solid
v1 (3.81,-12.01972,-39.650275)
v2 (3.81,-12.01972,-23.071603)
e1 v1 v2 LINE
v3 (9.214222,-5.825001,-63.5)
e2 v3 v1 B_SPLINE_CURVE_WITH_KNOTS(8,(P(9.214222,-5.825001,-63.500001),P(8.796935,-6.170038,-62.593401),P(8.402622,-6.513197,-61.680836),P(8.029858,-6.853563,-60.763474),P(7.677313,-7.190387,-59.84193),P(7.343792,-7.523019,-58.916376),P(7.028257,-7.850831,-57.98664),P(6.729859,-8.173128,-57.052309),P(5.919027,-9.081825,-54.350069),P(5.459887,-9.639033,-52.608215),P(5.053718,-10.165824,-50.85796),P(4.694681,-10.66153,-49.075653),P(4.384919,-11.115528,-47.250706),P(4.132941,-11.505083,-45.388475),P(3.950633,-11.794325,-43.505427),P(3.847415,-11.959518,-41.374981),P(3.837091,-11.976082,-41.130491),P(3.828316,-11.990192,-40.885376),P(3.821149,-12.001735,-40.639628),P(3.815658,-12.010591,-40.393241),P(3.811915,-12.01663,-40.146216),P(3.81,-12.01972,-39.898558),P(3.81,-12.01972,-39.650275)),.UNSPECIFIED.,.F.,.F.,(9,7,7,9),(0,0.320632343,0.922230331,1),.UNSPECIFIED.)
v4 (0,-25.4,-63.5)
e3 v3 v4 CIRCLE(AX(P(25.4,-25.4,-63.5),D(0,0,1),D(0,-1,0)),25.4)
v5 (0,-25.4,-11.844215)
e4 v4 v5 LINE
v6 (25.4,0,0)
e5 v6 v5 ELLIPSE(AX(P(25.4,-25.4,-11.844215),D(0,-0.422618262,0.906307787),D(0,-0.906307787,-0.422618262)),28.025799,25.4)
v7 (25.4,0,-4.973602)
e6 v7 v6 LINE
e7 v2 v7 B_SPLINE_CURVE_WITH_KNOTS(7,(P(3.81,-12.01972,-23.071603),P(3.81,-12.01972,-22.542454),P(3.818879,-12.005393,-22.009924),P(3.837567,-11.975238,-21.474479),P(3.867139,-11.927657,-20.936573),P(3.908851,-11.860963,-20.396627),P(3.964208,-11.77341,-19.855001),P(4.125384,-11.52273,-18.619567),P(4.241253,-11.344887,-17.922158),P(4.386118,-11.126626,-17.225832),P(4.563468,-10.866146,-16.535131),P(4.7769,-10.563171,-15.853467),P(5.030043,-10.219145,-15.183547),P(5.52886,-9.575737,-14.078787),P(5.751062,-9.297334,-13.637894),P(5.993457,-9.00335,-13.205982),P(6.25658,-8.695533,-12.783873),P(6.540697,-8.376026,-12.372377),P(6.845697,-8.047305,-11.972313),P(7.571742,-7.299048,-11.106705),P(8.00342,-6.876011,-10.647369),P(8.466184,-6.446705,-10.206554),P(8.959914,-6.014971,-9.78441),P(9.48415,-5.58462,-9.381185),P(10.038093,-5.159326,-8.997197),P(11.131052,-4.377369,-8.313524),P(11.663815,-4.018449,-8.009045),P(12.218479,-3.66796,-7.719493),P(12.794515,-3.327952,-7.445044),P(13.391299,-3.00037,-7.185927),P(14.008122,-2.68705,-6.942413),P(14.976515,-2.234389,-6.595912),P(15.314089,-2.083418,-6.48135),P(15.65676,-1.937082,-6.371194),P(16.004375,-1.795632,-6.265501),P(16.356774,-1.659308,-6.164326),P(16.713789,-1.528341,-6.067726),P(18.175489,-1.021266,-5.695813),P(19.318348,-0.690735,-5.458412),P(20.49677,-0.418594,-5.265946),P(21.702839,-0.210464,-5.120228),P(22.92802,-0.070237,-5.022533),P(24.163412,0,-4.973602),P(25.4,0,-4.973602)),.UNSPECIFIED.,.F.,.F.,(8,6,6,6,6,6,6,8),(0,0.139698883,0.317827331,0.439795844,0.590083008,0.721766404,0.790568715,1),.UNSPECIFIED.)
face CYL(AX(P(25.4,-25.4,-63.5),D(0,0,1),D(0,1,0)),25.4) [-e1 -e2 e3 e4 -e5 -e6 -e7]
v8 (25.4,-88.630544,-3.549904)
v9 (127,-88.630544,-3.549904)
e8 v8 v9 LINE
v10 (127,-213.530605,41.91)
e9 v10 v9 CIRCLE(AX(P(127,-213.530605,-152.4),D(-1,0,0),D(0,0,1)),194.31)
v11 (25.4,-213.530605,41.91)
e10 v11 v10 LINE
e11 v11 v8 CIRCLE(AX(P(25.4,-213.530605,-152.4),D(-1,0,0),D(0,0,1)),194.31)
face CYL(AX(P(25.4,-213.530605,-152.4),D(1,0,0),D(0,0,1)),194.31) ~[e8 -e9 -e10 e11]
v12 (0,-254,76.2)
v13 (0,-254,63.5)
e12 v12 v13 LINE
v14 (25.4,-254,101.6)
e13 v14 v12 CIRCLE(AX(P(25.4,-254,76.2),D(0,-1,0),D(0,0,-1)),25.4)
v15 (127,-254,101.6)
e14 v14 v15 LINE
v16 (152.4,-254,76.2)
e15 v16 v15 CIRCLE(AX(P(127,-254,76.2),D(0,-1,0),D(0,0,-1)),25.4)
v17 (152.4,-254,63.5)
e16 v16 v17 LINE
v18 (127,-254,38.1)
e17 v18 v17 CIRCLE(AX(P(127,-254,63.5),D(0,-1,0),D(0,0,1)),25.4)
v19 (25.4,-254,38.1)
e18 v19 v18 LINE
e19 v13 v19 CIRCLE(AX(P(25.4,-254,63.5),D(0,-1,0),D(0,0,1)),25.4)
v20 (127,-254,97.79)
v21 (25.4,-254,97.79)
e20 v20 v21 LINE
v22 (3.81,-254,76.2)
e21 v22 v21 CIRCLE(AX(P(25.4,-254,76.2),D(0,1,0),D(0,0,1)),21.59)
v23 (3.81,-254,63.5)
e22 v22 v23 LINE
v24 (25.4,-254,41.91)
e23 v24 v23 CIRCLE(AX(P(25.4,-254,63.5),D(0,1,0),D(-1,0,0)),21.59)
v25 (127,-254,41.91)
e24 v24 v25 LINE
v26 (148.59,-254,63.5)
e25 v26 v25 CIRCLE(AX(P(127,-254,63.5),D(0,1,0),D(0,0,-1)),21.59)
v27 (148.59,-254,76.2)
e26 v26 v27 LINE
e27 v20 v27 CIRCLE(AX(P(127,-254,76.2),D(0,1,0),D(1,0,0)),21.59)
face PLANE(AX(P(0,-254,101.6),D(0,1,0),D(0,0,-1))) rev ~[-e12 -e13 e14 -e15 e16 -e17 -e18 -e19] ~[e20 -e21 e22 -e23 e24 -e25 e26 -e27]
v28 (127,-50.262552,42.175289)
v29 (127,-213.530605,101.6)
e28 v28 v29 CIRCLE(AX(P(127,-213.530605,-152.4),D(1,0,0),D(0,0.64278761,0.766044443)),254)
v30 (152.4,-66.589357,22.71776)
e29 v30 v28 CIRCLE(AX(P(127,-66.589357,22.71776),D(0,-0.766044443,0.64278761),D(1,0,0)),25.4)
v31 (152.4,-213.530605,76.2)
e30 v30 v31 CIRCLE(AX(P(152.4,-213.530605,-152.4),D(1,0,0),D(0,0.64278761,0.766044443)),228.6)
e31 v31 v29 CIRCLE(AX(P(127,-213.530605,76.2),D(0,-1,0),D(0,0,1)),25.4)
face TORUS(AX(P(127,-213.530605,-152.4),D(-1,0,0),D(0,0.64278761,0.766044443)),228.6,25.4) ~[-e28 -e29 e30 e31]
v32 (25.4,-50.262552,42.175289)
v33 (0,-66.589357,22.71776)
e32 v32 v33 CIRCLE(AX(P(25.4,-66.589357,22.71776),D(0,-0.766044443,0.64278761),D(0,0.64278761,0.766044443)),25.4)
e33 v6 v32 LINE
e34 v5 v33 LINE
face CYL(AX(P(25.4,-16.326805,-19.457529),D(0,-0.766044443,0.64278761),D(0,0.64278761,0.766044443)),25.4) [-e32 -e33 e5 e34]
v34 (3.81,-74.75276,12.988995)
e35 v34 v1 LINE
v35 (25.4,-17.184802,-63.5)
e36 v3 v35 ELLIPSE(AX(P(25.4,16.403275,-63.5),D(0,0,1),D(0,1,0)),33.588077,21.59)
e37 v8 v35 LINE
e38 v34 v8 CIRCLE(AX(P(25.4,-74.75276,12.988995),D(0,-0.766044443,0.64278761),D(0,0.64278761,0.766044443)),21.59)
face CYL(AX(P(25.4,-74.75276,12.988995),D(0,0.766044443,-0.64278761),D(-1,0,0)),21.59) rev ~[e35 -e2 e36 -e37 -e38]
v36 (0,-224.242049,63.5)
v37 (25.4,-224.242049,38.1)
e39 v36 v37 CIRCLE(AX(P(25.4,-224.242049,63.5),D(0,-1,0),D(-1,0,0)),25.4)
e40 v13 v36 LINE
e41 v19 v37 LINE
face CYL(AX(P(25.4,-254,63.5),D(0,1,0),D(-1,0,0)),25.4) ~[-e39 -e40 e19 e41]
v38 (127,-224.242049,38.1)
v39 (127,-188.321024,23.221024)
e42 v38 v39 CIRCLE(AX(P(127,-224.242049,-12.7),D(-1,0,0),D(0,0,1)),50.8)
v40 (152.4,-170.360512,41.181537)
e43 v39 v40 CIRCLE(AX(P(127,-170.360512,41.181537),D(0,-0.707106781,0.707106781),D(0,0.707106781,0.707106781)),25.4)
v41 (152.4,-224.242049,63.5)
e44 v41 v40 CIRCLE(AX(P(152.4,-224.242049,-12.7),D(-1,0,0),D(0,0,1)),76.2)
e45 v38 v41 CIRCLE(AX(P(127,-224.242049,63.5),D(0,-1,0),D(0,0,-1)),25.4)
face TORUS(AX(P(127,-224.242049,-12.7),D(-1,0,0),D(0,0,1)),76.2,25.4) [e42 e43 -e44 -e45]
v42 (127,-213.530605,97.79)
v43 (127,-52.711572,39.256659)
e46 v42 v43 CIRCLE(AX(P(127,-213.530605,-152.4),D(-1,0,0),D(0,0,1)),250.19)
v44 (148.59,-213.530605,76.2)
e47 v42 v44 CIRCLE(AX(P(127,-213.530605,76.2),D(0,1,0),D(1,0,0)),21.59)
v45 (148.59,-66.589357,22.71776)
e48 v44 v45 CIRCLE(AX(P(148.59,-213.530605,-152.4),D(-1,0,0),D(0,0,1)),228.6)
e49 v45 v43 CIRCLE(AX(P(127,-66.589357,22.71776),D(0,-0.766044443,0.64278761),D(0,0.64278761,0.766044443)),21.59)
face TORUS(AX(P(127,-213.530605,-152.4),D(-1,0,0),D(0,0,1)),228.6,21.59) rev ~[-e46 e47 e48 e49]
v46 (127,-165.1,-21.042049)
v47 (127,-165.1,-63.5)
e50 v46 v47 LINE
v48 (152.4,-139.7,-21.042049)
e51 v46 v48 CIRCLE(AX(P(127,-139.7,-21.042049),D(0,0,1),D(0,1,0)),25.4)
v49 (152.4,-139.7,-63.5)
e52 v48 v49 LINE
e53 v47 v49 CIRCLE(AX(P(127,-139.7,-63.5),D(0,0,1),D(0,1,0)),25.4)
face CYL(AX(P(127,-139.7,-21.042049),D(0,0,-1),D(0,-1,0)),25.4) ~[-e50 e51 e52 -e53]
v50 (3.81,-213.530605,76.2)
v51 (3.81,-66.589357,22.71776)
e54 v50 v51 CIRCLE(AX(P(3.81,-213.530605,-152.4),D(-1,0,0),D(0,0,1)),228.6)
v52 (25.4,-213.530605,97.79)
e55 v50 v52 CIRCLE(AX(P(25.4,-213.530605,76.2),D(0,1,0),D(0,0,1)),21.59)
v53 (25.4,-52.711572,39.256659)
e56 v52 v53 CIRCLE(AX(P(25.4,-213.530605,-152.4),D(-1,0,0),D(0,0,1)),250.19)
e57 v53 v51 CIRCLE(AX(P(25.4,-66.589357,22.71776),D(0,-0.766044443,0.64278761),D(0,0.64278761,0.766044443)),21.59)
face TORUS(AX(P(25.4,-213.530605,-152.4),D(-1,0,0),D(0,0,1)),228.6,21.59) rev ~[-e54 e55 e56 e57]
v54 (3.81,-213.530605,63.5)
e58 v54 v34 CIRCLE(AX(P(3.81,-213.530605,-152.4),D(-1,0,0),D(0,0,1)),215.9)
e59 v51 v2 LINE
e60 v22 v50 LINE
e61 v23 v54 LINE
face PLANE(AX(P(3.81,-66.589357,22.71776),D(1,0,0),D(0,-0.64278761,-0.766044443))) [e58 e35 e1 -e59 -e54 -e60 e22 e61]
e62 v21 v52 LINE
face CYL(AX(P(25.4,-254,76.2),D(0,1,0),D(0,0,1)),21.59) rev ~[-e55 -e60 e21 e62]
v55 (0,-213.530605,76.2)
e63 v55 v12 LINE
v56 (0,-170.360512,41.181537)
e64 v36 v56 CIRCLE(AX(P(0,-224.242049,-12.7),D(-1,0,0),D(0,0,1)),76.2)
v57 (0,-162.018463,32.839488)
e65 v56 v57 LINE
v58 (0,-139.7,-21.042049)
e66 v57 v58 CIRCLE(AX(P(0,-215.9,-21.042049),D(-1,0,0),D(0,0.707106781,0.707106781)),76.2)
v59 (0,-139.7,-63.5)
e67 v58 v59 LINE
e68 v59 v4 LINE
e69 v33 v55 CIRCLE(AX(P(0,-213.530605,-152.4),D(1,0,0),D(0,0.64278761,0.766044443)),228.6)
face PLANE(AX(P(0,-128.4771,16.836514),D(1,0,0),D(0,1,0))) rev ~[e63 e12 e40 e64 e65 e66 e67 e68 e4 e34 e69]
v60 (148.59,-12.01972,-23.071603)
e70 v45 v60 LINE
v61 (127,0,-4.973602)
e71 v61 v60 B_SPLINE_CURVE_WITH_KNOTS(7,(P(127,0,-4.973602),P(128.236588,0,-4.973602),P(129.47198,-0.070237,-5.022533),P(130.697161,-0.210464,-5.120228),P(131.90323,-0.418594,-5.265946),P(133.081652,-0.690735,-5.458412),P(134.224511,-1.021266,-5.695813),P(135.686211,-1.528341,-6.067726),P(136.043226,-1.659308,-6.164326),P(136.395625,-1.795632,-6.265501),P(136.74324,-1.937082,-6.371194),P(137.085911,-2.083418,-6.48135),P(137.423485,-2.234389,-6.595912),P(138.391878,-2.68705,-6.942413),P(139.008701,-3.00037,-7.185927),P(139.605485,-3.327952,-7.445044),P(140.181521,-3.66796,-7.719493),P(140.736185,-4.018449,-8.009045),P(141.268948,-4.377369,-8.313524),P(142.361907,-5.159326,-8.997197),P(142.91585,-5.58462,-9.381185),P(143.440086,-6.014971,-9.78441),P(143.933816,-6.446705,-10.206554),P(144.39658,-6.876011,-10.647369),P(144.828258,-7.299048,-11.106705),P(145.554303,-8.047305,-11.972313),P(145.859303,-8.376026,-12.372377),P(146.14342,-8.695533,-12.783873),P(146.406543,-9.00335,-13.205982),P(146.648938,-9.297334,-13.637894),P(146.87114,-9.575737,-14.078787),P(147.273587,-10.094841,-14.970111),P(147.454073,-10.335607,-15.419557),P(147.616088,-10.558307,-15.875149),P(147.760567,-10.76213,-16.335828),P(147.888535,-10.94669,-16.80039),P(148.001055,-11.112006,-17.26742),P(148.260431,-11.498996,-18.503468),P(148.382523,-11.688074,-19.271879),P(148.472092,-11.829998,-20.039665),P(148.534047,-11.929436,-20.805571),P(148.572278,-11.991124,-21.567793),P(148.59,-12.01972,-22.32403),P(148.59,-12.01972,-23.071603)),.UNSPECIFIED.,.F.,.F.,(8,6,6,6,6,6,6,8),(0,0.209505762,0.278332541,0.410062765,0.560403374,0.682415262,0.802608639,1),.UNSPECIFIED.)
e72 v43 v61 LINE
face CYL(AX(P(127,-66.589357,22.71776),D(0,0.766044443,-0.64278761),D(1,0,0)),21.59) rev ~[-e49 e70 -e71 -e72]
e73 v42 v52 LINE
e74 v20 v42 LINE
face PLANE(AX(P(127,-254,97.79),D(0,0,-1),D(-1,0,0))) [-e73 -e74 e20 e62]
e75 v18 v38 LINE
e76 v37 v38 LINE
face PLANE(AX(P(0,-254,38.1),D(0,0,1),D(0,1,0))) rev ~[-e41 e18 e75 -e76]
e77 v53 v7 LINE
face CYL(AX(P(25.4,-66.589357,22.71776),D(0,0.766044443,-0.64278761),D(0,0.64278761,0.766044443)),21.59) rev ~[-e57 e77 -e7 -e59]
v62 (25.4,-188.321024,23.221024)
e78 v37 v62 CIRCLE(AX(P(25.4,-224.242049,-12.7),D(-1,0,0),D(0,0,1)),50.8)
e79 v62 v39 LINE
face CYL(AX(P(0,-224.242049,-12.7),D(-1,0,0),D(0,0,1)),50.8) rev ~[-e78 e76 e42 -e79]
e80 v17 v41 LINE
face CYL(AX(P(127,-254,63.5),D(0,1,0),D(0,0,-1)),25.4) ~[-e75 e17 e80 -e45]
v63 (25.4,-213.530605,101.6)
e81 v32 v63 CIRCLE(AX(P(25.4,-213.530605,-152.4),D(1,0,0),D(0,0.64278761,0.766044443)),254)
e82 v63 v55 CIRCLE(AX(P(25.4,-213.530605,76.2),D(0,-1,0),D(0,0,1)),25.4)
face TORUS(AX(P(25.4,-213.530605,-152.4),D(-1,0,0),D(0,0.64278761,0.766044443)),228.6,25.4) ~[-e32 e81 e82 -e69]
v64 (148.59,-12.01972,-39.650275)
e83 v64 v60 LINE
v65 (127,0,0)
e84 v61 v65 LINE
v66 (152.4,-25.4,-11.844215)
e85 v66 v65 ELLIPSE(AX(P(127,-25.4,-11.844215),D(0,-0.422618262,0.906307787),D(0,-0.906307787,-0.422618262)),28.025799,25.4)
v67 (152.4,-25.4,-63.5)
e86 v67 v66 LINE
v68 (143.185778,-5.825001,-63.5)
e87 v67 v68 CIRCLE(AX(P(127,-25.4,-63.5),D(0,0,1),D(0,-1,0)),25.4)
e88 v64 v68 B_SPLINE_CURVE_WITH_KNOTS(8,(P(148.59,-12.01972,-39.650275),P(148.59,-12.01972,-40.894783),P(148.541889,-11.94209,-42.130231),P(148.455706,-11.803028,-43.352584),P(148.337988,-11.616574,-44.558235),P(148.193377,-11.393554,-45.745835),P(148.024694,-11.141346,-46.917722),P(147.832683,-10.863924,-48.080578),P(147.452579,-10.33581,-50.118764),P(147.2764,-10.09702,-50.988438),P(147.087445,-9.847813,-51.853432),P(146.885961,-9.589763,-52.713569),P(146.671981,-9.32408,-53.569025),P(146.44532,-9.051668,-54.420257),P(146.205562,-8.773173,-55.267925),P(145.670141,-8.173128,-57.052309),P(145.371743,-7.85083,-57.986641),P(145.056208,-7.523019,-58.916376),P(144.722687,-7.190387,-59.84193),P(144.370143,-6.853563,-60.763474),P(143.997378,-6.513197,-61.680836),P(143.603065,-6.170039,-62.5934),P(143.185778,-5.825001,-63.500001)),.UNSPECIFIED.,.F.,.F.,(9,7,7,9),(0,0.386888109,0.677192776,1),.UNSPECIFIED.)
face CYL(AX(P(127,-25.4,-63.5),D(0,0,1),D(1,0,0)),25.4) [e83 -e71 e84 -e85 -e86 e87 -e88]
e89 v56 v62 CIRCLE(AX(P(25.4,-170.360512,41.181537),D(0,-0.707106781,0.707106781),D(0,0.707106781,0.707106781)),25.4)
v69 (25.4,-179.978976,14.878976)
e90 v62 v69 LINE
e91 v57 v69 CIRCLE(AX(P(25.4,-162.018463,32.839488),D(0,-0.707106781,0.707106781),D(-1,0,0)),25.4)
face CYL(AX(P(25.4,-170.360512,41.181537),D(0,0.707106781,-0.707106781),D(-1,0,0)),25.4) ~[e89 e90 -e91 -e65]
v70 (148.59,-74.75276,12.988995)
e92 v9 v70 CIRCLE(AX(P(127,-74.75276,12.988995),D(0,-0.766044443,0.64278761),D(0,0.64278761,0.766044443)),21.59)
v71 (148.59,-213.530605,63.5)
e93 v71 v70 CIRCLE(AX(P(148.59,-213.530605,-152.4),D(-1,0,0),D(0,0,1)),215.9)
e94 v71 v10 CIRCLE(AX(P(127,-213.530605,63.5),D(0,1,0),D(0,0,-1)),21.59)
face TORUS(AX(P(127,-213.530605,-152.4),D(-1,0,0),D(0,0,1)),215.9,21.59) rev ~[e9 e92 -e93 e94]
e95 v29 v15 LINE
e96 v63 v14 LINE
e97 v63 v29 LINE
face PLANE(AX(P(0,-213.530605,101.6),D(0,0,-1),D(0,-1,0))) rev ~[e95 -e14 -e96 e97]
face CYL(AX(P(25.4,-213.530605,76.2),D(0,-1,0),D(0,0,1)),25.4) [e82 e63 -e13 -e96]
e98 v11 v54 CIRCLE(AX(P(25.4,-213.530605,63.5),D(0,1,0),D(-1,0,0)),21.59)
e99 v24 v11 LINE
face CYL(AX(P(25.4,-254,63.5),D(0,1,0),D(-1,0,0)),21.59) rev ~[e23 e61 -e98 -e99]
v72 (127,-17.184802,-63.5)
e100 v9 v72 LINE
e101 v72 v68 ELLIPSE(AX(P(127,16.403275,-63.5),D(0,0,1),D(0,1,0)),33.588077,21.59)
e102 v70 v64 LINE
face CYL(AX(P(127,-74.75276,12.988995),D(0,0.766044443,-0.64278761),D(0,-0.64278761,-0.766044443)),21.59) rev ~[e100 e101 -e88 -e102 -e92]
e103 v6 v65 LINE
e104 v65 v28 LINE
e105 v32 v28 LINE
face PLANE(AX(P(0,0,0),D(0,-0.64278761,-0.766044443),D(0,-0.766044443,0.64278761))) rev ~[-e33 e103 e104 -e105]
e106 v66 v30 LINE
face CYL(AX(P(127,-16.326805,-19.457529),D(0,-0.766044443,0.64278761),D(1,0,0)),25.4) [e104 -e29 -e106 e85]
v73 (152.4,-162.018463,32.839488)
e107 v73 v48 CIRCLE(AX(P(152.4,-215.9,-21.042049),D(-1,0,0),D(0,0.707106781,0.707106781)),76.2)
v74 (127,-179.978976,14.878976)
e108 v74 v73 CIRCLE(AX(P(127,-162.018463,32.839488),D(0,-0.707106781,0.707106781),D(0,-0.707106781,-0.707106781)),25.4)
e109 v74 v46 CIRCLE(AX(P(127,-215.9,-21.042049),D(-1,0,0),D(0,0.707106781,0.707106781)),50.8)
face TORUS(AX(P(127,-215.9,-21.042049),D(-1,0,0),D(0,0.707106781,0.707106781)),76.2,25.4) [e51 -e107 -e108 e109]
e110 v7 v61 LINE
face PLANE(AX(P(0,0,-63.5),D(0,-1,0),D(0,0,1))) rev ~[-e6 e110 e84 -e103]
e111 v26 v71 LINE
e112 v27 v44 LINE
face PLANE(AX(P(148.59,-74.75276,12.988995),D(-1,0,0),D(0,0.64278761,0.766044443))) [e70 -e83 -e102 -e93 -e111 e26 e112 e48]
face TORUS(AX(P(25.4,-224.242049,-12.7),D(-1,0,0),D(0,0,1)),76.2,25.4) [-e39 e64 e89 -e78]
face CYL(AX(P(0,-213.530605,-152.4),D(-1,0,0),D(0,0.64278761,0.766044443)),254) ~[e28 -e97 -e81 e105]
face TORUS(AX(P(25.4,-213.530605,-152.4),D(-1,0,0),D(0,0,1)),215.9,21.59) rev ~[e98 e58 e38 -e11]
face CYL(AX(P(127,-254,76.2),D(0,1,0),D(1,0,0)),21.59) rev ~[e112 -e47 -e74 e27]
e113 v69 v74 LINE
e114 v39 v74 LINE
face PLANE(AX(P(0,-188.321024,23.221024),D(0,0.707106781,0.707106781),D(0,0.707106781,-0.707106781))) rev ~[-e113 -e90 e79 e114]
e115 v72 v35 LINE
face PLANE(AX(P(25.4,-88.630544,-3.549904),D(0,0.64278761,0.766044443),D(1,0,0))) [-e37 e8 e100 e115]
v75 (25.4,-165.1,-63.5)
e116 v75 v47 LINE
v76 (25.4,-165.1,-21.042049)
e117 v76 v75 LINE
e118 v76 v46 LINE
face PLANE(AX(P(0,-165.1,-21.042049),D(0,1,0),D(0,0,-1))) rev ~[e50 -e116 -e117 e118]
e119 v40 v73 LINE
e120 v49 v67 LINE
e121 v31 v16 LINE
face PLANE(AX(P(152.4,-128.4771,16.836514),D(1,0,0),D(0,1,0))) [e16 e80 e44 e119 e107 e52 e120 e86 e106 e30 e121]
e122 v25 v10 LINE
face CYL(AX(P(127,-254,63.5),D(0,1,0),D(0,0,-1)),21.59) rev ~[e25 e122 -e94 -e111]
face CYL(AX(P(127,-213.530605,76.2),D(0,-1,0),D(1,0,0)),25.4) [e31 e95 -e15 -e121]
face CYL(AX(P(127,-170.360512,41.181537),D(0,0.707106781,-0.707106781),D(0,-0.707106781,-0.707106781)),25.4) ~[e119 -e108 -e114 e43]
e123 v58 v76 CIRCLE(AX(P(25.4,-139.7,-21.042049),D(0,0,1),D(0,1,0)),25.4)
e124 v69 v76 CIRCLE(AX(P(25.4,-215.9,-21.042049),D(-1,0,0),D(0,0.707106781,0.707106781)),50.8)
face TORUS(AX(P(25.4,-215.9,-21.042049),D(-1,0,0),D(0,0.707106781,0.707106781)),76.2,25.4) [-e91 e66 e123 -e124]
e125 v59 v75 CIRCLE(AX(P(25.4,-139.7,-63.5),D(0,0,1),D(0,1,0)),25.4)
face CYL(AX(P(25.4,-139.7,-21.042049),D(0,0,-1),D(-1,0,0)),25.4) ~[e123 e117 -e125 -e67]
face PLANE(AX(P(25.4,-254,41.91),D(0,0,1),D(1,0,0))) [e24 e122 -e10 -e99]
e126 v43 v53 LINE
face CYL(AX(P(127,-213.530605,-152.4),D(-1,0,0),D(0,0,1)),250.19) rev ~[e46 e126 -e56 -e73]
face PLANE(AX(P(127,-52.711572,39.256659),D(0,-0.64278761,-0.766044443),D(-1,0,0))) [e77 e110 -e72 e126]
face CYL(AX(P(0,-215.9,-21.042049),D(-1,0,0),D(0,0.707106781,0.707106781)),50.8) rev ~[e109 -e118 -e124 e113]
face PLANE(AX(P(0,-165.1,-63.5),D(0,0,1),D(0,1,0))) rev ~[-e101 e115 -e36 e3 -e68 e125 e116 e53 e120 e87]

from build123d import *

# Parameters (mm, degrees)
F1_DEPTH = 152.4
F2_R     = 25.4
F3_R     = 25.4
F4_R     = 25.4
F5_R     = 25.4


# Not quite as in the source:
# - a feature names something its author has since deleted; it is built from what else it names


with BuildPart() as f1:
    # F0 (on Right) → F1 (new body)
    with BuildSketch(Plane.YZ):
        with BuildLine():
            Line((0, -63.5), (0, 0))
            Line((0, 0), (-50.2625516508, 42.1752885522))
            ThreePointArc((-50.2625516508, 42.1752885522), (-126.6574881065, 86.2819256796), (-213.5306045112, 101.6))
            Line((-213.5306045112, 101.6), (-254, 101.6))
            Line((-254, 101.6), (-254, 38.1))
            Line((-254, 38.1), (-224.2420489686, 38.1))
            ThreePointArc((-224.2420489686, 38.1), (-204.8017306044, 34.2330802516), (-188.3210244843, 23.2210244843))
            Line((-188.3210244843, 23.2210244843), (-179.9789755157, 14.8789755157))
            ThreePointArc((-179.9789755157, 14.8789755157), (-168.9669197484, -1.6017306044), (-165.1, -21.0420489686))
            Line((-165.1, -21.0420489686), (-165.1, -63.5))
            Line((-165.1, -63.5), (0, -63.5))
        make_face()
    extrude(amount=F1_DEPTH)

    # F2
    f2_edges = [f1.edges().sort_by_distance(p)[0] for p in [
        (0, -233.765302, 101.6),
        (0, 0, -31.75),
    ]]
    fillet(f2_edges, radius=F2_R)

    # F3
    f3_edges = [f1.edges().sort_by_distance(p)[0] for p in [
        (0, -165.1, -42.271024),
    ]]
    fillet(f3_edges, radius=F3_R)

    # F4
    f4_edges = [f1.edges().sort_by_distance(p)[0] for p in [
        (152.4, -165.1, -42.271024),
    ]]
    fillet(f4_edges, radius=F4_R)

    # F5
    f5_edges = [f1.edges().sort_by_distance(p)[0] for p in [
        (152.4, -233.765302, 101.6),
        (152.4, 0, -31.75),
    ]]
    fillet(f5_edges, radius=F5_R)

    # F9: sweep along a path in F8
    with BuildLine(Plane.YZ.offset(76.2)) as f9_path:
        Line((-254, 69.85), (-213.5306045112, 69.85))
        ThreePointArc((-213.5306045112, 69.85), (-137.5166276571, 56.4466849697), (-70.6710582584, 17.8533774832))
        Line((-70.6710582584, 17.8533774832), (74.6758873088, -104.1071909349))
    # F6 (on face) → F9 (sweep, cut)
    with BuildSketch(Plane.XZ.offset(254)):
        with BuildLine():
            Line((25.4, 41.91), (127, 41.91))
            ThreePointArc((127, 41.91), (142.2664354058, 48.2335645942), (148.59, 63.5))
            Line((148.59, 63.5), (148.59, 76.2))
            ThreePointArc((148.59, 76.2), (142.2664354058, 91.4664354058), (127, 97.79))
            Line((127, 97.79), (25.4, 97.79))
            ThreePointArc((25.4, 97.79), (10.1335645942, 91.4664354058), (3.81, 76.2))
            Line((3.81, 76.2), (3.81, 63.5))
            ThreePointArc((3.81, 63.5), (10.1335645942, 48.2335645942), (25.4, 41.91))
        make_face()
    sweep(path=f9_path.line, mode=Mode.SUBTRACT)


solid = f1.part
